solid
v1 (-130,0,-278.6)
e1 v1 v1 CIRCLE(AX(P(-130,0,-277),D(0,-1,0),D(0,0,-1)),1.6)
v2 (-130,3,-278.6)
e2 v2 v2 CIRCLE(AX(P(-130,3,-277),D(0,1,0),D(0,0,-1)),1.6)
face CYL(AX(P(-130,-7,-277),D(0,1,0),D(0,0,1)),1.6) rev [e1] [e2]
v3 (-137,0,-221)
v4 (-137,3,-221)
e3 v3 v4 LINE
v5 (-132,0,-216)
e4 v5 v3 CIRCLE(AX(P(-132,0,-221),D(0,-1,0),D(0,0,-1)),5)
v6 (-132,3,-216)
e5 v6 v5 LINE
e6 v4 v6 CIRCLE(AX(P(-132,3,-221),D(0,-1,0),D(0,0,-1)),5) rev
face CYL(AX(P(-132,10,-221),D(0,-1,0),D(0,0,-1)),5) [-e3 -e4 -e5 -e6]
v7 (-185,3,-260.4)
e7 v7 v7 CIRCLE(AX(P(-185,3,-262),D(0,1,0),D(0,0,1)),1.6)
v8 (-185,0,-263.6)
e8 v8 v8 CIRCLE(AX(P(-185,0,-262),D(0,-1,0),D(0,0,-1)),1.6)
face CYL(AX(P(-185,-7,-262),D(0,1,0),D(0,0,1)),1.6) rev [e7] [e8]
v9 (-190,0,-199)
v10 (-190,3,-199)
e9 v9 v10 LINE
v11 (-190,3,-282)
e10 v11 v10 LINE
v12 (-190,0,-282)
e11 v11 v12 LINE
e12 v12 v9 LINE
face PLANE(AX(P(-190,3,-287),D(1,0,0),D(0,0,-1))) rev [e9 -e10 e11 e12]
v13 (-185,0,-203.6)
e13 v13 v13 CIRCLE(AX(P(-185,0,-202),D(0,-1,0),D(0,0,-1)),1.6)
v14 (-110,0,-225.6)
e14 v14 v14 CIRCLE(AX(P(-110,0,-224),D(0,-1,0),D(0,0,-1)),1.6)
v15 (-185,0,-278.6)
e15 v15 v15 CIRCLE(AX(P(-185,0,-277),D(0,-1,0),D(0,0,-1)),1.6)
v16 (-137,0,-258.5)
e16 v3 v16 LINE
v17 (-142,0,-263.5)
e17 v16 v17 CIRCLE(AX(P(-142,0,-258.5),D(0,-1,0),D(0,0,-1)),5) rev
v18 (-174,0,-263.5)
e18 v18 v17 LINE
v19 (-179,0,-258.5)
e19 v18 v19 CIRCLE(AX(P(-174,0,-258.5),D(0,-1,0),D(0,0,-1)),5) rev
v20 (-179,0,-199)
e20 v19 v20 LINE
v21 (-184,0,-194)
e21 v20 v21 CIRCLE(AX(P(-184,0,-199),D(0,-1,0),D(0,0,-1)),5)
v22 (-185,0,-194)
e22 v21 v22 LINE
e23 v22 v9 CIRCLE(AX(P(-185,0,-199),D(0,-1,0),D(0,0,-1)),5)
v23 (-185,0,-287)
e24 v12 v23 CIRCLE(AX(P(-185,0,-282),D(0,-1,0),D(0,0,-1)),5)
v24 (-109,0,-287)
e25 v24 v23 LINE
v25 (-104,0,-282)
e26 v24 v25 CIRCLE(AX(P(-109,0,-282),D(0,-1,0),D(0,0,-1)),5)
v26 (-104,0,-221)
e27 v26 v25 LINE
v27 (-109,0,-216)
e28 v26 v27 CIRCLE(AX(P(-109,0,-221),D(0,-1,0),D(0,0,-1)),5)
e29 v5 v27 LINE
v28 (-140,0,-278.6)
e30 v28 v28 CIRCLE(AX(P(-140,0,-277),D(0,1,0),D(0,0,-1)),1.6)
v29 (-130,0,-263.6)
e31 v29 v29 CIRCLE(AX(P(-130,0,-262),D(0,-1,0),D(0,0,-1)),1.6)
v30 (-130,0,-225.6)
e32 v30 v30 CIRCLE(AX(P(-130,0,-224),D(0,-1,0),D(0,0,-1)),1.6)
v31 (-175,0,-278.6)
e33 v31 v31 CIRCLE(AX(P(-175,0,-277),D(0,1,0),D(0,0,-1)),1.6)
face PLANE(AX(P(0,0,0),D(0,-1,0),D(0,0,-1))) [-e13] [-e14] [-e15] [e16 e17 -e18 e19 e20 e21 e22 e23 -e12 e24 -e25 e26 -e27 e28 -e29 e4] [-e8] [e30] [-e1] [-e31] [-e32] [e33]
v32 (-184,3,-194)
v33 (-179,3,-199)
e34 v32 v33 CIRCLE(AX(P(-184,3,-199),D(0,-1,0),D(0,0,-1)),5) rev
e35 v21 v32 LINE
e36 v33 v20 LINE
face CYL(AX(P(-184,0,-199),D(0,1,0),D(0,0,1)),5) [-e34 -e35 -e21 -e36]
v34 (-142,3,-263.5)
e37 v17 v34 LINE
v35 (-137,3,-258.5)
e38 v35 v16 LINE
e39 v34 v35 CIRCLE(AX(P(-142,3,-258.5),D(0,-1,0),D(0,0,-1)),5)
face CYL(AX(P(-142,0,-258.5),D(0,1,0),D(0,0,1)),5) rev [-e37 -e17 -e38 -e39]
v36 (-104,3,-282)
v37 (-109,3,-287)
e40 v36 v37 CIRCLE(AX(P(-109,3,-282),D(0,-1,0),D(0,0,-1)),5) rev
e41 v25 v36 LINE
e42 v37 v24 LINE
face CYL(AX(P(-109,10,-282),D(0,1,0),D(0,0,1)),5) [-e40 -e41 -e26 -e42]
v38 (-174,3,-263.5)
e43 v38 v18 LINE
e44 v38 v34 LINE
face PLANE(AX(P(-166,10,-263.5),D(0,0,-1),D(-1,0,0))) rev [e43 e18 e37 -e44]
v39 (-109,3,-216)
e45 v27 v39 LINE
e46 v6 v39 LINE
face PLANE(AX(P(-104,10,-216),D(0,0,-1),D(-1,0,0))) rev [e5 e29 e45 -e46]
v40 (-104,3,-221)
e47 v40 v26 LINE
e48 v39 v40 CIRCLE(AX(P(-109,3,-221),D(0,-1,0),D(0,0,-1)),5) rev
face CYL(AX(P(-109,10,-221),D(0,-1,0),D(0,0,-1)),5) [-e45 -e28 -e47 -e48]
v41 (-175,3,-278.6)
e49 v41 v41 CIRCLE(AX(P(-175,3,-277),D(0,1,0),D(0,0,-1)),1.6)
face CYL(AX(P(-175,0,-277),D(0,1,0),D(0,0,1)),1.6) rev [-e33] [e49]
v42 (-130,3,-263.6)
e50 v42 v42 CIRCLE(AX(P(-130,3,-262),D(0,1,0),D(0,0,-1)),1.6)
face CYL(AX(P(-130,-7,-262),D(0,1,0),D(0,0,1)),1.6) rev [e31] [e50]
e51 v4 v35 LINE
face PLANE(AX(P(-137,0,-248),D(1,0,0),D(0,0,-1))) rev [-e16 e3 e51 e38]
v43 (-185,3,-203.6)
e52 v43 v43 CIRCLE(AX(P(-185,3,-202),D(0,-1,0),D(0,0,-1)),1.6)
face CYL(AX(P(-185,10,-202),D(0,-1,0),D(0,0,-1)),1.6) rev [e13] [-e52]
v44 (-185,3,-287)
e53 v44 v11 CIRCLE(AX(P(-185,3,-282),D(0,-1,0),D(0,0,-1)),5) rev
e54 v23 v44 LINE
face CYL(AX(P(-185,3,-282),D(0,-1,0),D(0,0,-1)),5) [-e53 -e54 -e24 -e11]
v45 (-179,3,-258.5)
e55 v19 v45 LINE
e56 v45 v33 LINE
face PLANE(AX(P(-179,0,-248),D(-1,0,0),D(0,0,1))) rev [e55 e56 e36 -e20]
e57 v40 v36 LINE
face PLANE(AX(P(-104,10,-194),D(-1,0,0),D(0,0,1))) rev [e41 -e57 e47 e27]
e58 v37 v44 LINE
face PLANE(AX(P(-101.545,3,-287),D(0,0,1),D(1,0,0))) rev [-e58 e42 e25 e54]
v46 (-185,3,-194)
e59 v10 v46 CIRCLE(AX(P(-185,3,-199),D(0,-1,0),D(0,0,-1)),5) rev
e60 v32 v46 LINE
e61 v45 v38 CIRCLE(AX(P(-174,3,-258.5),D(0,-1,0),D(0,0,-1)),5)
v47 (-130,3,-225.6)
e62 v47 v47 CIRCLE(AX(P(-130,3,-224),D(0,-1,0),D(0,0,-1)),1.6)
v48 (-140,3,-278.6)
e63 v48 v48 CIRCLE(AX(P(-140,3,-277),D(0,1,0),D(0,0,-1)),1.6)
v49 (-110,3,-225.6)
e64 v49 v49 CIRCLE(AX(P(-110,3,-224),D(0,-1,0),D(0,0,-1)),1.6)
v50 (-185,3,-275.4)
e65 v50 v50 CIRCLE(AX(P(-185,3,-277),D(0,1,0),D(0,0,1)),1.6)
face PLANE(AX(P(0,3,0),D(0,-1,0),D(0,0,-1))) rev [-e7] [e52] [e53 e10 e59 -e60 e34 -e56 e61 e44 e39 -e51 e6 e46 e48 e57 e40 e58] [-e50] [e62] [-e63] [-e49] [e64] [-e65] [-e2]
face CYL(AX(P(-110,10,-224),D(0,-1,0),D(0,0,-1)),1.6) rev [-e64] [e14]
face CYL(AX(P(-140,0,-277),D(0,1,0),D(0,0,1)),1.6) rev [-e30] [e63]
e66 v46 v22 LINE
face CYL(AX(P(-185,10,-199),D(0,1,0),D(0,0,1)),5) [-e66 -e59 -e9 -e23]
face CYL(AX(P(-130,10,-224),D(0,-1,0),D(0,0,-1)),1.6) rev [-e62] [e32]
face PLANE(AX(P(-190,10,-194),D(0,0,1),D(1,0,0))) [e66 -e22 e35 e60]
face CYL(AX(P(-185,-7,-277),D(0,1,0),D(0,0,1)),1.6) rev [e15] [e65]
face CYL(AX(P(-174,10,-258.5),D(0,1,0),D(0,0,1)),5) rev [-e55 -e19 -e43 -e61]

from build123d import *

# Parameters (mm, degrees)
EXTRUDE_1048_DEPTH      = 3
SKETCH_2_R              = 37.5
SKETCH_2_R_2            = 1.6
CUT_EXTRUDE_1713_DEPTH  = 3
SKETCH_8_W              = 65
SKETCH_8_H              = 25
CUT_EXTRUDE_2585_DEPTH  = 3
SKETCH_41_W             = 55
SKETCH_41_H             = 60
CUT_EXTRUDE_2_DEPTH     = 10
SKETCH_10_W             = 65
SKETCH_10_H             = 30
CUT_EXTRUDE_3791_DEPTH  = 3
SKETCH_11_R             = 1.6
SKETCH_11_W             = 42
SKETCH_11_H             = 28
CUT_EXTRUDE_4900_DEPTH  = 3
SKETCH_13_R             = 1.6
CUT_EXTRUDE_5556_DEPTH  = 3
SKETCH_14_R             = 2
CUT_EXTRUDE_5906_DEPTH  = 3
SKETCH_15_R             = 2
CUT_EXTRUDE_6166_DEPTH  = 3
SKETCH_16_R             = 1.6
CUT_EXTRUDE_6673_DEPTH  = 3
SKETCH_19_R             = 2
SKETCH_19_R_2           = 2.5
CUT_EXTRUDE_7839_DEPTH  = 3
SKETCH_21_R             = 1.6
CUT_EXTRUDE_7991_DEPTH  = 3
CUT_EXTRUDE_9_DEPTH     = 10
SKETCH_33_R             = 1.6
PC_DEPTH                = 10
SKETCH_36_R             = 1.6
CUT_EXTRUDE_9334_DEPTH  = 345.206333469
SKETCH_29_R             = 1.6
CUT_EXTRUDE_9716_DEPTH  = 10
SKETCH_39_R             = 1.6
CUT_EXTRUDE_10318_DEPTH = 10
SKETCH_42_W             = 40
SKETCH_42_H             = 40
CUT_EXTRUDE_11_DEPTH    = 10
SKETCH_34_R             = 1.6
UWB_DEPTH               = 10
SKETCH_47_R             = 1.6
CUT_EXTRUDE_13151_DEPTH = 345.206333469
SKETCH_48_R             = 1.6
CUT_EXTRUDE_14_DEPTH    = 345.206333469
CUT_EXTRUDE_6623_DEPTH  = 10
FILLET_13946_R          = 5
FILLET_14545_R          = 2
SKETCH_53_R             = 1.6
RFID_DEPTH              = 10
SKETCH_54_R             = 1.6
CUT_EXTRUDE_19166_DEPTH = 10
SKETCH_55_OUTSIDE_W     = 518.68
SKETCH_55_OUTSIDE_H     = 706.68
CUT_EXTRUDE_17_DEPTH    = 10
FILLET_1_R              = 5
SKETCH_56_R             = 1.6
CUT_EXTRUDE_18_DEPTH    = 10
SKETCH_57_W             = 16
SKETCH_57_H             = 59
CUT_EXTRUDE_19_DEPTH    = 10
SKETCH_58_R             = 1.55
CUT_EXTRUDE_20_DEPTH    = 10
FILLET_2_R              = 2
SKETCH_59_W             = 42
SKETCH_59_H             = 69.5
CUT_EXTRUDE_21_DEPTH    = 10
SKETCH_61_W             = 31.526817686
SKETCH_61_H             = 93
CUT_EXTRUDE_23_DEPTH    = 10
SKETCH_62_W             = 33
SKETCH_62_H             = 22
CUT_EXTRUDE_24_DEPTH    = 10
FILLET_3_R              = 5
SKETCH_63_R             = 1.6
CUT_EXTRUDE_25_DEPTH    = 10


with BuildPart() as part:
    # 草图1 → Extrude 1048 (new body)
    with BuildSketch(Plane(origin=(0, 0, 0), x_dir=(1, 0, 0), z_dir=(0, 1, 0))):
        Polygon((190, 287), (101.545, 287), (79.605689771, 249), (-79.605689771, 249), (-101.545, 287), (-190, 287), (-190, 0), (-190, -281), (-144.091695942, -281), (-98.660254038, -281), (-74.411542732, -239), (74.411542732, -239), (98.660254038, -281), (144.091695942, -281), (190, -281), (190, 0), align=None)
    extrude(amount=EXTRUDE_1048_DEPTH)

    # 草图2 → Cut-Extrude 1713 (cut)
    with BuildSketch(Plane(origin=(0, 3, 0), x_dir=(1, 0, 0), z_dir=(0, 1, 0))):
        Circle(SKETCH_2_R)
        with Locations((38.97114317, 22.5)):
            Circle(SKETCH_2_R_2)
        with Locations((0, -45)):
            Circle(SKETCH_2_R_2)
        with Locations((-38.97114317, 22.5)):
            Circle(SKETCH_2_R_2)
    extrude(amount=-CUT_EXTRUDE_1713_DEPTH, mode=Mode.SUBTRACT)

    # 草图8 → Cut-Extrude 2585 (cut)
    with BuildSketch(Plane(origin=(0, 3, 0), x_dir=(1, 0, 0), z_dir=(0, 1, 0))):
        with Locations((115, -161.5)):
            Rectangle(SKETCH_8_W, SKETCH_8_H)
        with Locations((-115, -161.5)):
            Rectangle(SKETCH_8_W, SKETCH_8_H)
    extrude(amount=-CUT_EXTRUDE_2585_DEPTH, mode=Mode.SUBTRACT)

    # 草图41 → 减重过线孔2 (cut)
    with BuildSketch(Plane(origin=(0, 3, 0), x_dir=(1, 0, 0), z_dir=(0, 1, 0))):
        with Locations((-102.5, 70)):
            Rectangle(SKETCH_41_W, SKETCH_41_H)
        with Locations((102.5, 70)):
            Rectangle(SKETCH_41_W, SKETCH_41_H)
        with Locations((102.5, -70)):
            Rectangle(SKETCH_41_W, SKETCH_41_H)
        with Locations((-102.5, -70)):
            Rectangle(SKETCH_41_W, SKETCH_41_H)
    extrude(amount=-CUT_EXTRUDE_2_DEPTH, mode=Mode.SUBTRACT)

    # 草图10 → Cut-Extrude 3791 (cut)
    with BuildSketch(Plane(origin=(0, 3, 0), x_dir=(1, 0, 0), z_dir=(0, 1, 0))):
        with Locations((-130, 167)):
            Rectangle(SKETCH_10_W, SKETCH_10_H)
        with Locations((130, 167)):
            Rectangle(SKETCH_10_W, SKETCH_10_H)
    extrude(amount=-CUT_EXTRUDE_3791_DEPTH, mode=Mode.SUBTRACT)

    # 草图11 → Cut-Extrude 4900 (cut)
    with BuildSketch(Plane(origin=(0, 3, 0), x_dir=(1, 0, 0), z_dir=(0, 1, 0))):
        with Locations((-153.5, 259)):
            Circle(SKETCH_11_R)
        with Locations((-162.5, 259)):
            Circle(SKETCH_11_R)
        with Locations((-153.5, 209)):
            Circle(SKETCH_11_R)
        with Locations((-162.5, 209)):
            Circle(SKETCH_11_R)
        with Locations((153.5, 259)):
            Circle(SKETCH_11_R)
        with Locations((162.5, 259)):
            Circle(SKETCH_11_R)
        with Locations((153.5, 209)):
            Circle(SKETCH_11_R)
        with Locations((162.5, 209)):
            Circle(SKETCH_11_R)
        with Locations((162.5, -209)):
            Circle(SKETCH_11_R)
        with Locations((153.5, -209)):
            Circle(SKETCH_11_R)
        with Locations((162.5, -259)):
            Circle(SKETCH_11_R)
        with Locations((153.5, -259)):
            Circle(SKETCH_11_R)
        with Locations((-162.5, -209)):
            Circle(SKETCH_11_R)
        with Locations((-153.5, -209)):
            Circle(SKETCH_11_R)
        with Locations((-153.5, -259)):
            Circle(SKETCH_11_R)
        with Locations((-162.5, -259)):
            Circle(SKETCH_11_R)
        with Locations((-158, 234)):
            Rectangle(SKETCH_11_W, SKETCH_11_H)
        with Locations((158, 234)):
            Rectangle(SKETCH_11_W, SKETCH_11_H)
        with Locations((158, -234)):
            Rectangle(SKETCH_11_W, SKETCH_11_H)
        with Locations((-158, -234)):
            Rectangle(SKETCH_11_W, SKETCH_11_H)
    extrude(amount=-CUT_EXTRUDE_4900_DEPTH, mode=Mode.SUBTRACT)

    # 草图13 → Cut-Extrude 5556 (cut)
    with BuildSketch(Plane(origin=(0, 3, 0), x_dir=(1, 0, 0), z_dir=(0, 1, 0))):
        with Locations((25, 176)):
            Circle(SKETCH_13_R)
        with Locations((25, 226)):
            Circle(SKETCH_13_R)
        with Locations((-25, 226)):
            Circle(SKETCH_13_R)
        with Locations((-25, 176)):
            Circle(SKETCH_13_R)
    extrude(amount=-CUT_EXTRUDE_5556_DEPTH, mode=Mode.SUBTRACT)

    # 草图14 → Cut-Extrude 5906 (cut)
    with BuildSketch(Plane(origin=(0, 3, 0), x_dir=(1, 0, 0), z_dir=(0, 1, 0))):
        with Locations((-47.5, 239)):
            Circle(SKETCH_14_R)
        with Locations((-47.5, 214)):
            Circle(SKETCH_14_R)
        with Locations((47.5, 214)):
            Circle(SKETCH_14_R)
        with Locations((47.5, 239)):
            Circle(SKETCH_14_R)
        with Locations((-47.5, -207)):
            Circle(SKETCH_14_R)
        with Locations((-47.5, -232)):
            Circle(SKETCH_14_R)
        with Locations((47.5, -232)):
            Circle(SKETCH_14_R)
        with Locations((47.5, -207)):
            Circle(SKETCH_14_R)
    extrude(amount=-CUT_EXTRUDE_5906_DEPTH, mode=Mode.SUBTRACT)

    # 草图15 → Cut-Extrude 6166 (cut)
    with BuildSketch(Plane(origin=(0, 3, 0), x_dir=(1, 0, 0), z_dir=(0, 1, 0))):
        with Locations((155, 47.5)):
            Circle(SKETCH_15_R)
        with Locations((180, 47.5)):
            Circle(SKETCH_15_R)
        with Locations((180, -47.5)):
            Circle(SKETCH_15_R)
        with Locations((155, -47.5)):
            Circle(SKETCH_15_R)
        with Locations((-155, -47.5)):
            Circle(SKETCH_15_R)
        with Locations((-180, -47.5)):
            Circle(SKETCH_15_R)
        with Locations((-180, 47.5)):
            Circle(SKETCH_15_R)
        with Locations((-155, 47.5)):
            Circle(SKETCH_15_R)
    extrude(amount=-CUT_EXTRUDE_6166_DEPTH, mode=Mode.SUBTRACT)

    # 草图16 → Cut-Extrude 6673 (cut)
    with BuildSketch(Plane(origin=(0, 3, 0), x_dir=(1, 0, 0), z_dir=(0, 1, 0))):
        with Locations((-64, 229)):
            Circle(SKETCH_16_R)
        with Locations((-64, 117)):
            Circle(SKETCH_16_R)
        with Locations((-64, 5)):
            Circle(SKETCH_16_R)
        with Locations((-64, -107)):
            Circle(SKETCH_16_R)
        with Locations((-64, -219)):
            Circle(SKETCH_16_R)
        with Locations((64, 229)):
            Circle(SKETCH_16_R)
        with Locations((64, -107)):
            Circle(SKETCH_16_R)
        with Locations((64, 5)):
            Circle(SKETCH_16_R)
        with Locations((64, 117)):
            Circle(SKETCH_16_R)
        with Locations((64, -219)):
            Circle(SKETCH_16_R)
    extrude(amount=-CUT_EXTRUDE_6673_DEPTH, mode=Mode.SUBTRACT)

    # 草图19 → Cut-Extrude 7839 (cut)
    with BuildSketch(Plane(origin=(0, 3, 0), x_dir=(1, 0, 0), z_dir=(0, 1, 0))):
        with Locations((-177.5, -78)):
            Circle(SKETCH_19_R)
        with Locations((-177.5, -94)):
            Circle(SKETCH_19_R_2)
        with Locations((-177.5, 94)):
            Circle(SKETCH_19_R_2)
        with Locations((-177.5, 78)):
            Circle(SKETCH_19_R)
        with Locations((177.5, -94)):
            Circle(SKETCH_19_R_2)
        with Locations((177.5, -78)):
            Circle(SKETCH_19_R)
        with Locations((177.5, 78)):
            Circle(SKETCH_19_R)
        with Locations((177.5, 94)):
            Circle(SKETCH_19_R_2)
    extrude(amount=-CUT_EXTRUDE_7839_DEPTH, mode=Mode.SUBTRACT)

    # 草图21 → Cut-Extrude 7991 (cut)
    with BuildSketch(Plane(origin=(0, 3, 0), x_dir=(1, 0, 0), z_dir=(0, 1, 0))):
        with Locations((0, -93)):
            Circle(SKETCH_21_R)
    extrude(amount=-CUT_EXTRUDE_7991_DEPTH, mode=Mode.SUBTRACT)

    # 草图32 → 切除-拉伸9 (cut)
    with BuildSketch(Plane(origin=(0, 3, 0), x_dir=(1, 0, 0), z_dir=(0, 1, 0))):
        with BuildLine():
            Line((-34.5, -190), (34.5, -190))
            ThreePointArc((34.5, -190), (36.621320344, -189.121320344), (37.5, -187))
            Line((37.5, -187), (37.5, -133))
            ThreePointArc((37.5, -133), (36.621320344, -130.878679656), (34.5, -130))
            Line((34.5, -130), (-34.5, -130))
            ThreePointArc((-34.5, -130), (-36.621320344, -130.878679656), (-37.5, -133))
            Line((-37.5, -133), (-37.5, -187))
            ThreePointArc((-37.5, -187), (-36.621320344, -189.121320344), (-34.5, -190))
        make_face()
    extrude(amount=-CUT_EXTRUDE_9_DEPTH, mode=Mode.SUBTRACT)

    # 草图33 → PC座固定孔 (cut)
    with BuildSketch(Plane(origin=(0, 3, 0), x_dir=(1, 0, 0), z_dir=(0, 1, 0))):
        with Locations((-42.5, -120.5)):
            Circle(SKETCH_33_R)
        with Locations((42.5, -120.5)):
            Circle(SKETCH_33_R)
    extrude(amount=-PC_DEPTH, mode=Mode.SUBTRACT)

    # 草图36 → Cut-Extrude 9334 (cut, through all)
    with BuildSketch(Plane(origin=(0, 3, 0), x_dir=(1, 0, 0), z_dir=(0, 1, 0))):
        with Locations((-80, -231)):
            Circle(SKETCH_36_R)
        with Locations((-80, -219)):
            Circle(SKETCH_36_R)
        with Locations((80, -219)):
            Circle(SKETCH_36_R)
        with Locations((80, -231)):
            Circle(SKETCH_36_R)
        with Locations((-80, 241)):
            Circle(SKETCH_36_R)
        with Locations((-80, 229)):
            Circle(SKETCH_36_R)
        with Locations((80, 229)):
            Circle(SKETCH_36_R)
        with Locations((80, 241)):
            Circle(SKETCH_36_R)
    extrude(amount=-CUT_EXTRUDE_9334_DEPTH, mode=Mode.SUBTRACT)

    # 草图29 → Cut-Extrude 9716 (cut)
    with BuildSketch(Plane(origin=(0, 3, 0), x_dir=(1, 0, 0), z_dir=(0, 1, 0))):
        with Locations((48, 120)):
            Circle(SKETCH_29_R)
        with Locations((0, 86)):
            Circle(SKETCH_29_R)
        with Locations((0, 154)):
            Circle(SKETCH_29_R)
        with Locations((-48, 120)):
            Circle(SKETCH_29_R)
        with BuildLine():
            Line((40, 98), (40, 142))
            ThreePointArc((40, 142), (39.121320344, 144.121320344), (37, 145))
            Line((37, 145), (-37, 145))
            ThreePointArc((-37, 145), (-39.121320344, 144.121320344), (-40, 142))
            Line((-40, 142), (-40, 98))
            ThreePointArc((-40, 98), (-39.121320344, 95.878679656), (-37, 95))
            Line((-37, 95), (37, 95))
            ThreePointArc((37, 95), (39.121320344, 95.878679656), (40, 98))
        make_face()
    extrude(amount=-CUT_EXTRUDE_9716_DEPTH, mode=Mode.SUBTRACT)

    # 草图39 → Cut-Extrude 10318 (cut)
    with BuildSketch(Plane(origin=(0, 3, 0), x_dir=(1, 0, 0), z_dir=(0, 1, 0))):
        with Locations((185, -271)):
            Circle(SKETCH_39_R)
        with Locations((185, -256)):
            Circle(SKETCH_39_R)
        with Locations((130, -256)):
            Circle(SKETCH_39_R)
        with Locations((130, -271)):
            Circle(SKETCH_39_R)
        with Locations((-130, -271)):
            Circle(SKETCH_39_R)
        with Locations((-130, -256)):
            Circle(SKETCH_39_R)
        with Locations((-185, -256)):
            Circle(SKETCH_39_R)
        with Locations((-185, -271)):
            Circle(SKETCH_39_R)
        with Locations((-130, 262)):
            Circle(SKETCH_39_R)
        with Locations((-130, 277)):
            Circle(SKETCH_39_R)
        with Locations((185, 262)):
            Circle(SKETCH_39_R)
        with Locations((185, 277)):
            Circle(SKETCH_39_R)
        with Locations((-185, 277)):
            Circle(SKETCH_39_R)
        with Locations((-185, 262)):
            Circle(SKETCH_39_R)
        with Locations((130, 277)):
            Circle(SKETCH_39_R)
        with Locations((130, 262)):
            Circle(SKETCH_39_R)
    extrude(amount=-CUT_EXTRUDE_10318_DEPTH, mode=Mode.SUBTRACT)

    # 草图42 → 切除-拉伸11 (cut)
    with BuildSketch(Plane(origin=(0, 3, 0), x_dir=(1, 0, 0), z_dir=(0, 1, 0))):
        with Locations((0, 201)):
            Rectangle(SKETCH_42_W, SKETCH_42_H)
    extrude(amount=-CUT_EXTRUDE_11_DEPTH, mode=Mode.SUBTRACT)

    # 草图34 → UWB固定孔 (cut)
    with BuildSketch(Plane(origin=(0, 3, 0), x_dir=(1, 0, 0), z_dir=(0, 1, 0))):
        with Locations((90, 168)):
            Circle(SKETCH_34_R)
        with Locations((71, 187)):
            Circle(SKETCH_34_R)
        with Locations((90, 206)):
            Circle(SKETCH_34_R)
        with Locations((109, 187)):
            Circle(SKETCH_34_R)
    extrude(amount=-UWB_DEPTH, mode=Mode.SUBTRACT)

    # 草图47 → Cut-Extrude 13151 (cut, through all)
    with BuildSketch(Plane(origin=(0, 3, 0), x_dir=(1, 0, 0), z_dir=(0, 1, 0))):
        with Locations((140, 277)):
            Circle(SKETCH_47_R)
        with Locations((185, -271)):
            Circle(SKETCH_47_R)
        with Locations((95, -231)):
            Circle(SKETCH_47_R)
        with Locations((175, -271)):
            Circle(SKETCH_47_R)
        with Locations((140, 213)):
            Circle(SKETCH_47_R)
        with Locations((175, -207)):
            Circle(SKETCH_47_R)
        with Locations((-140, -271)):
            Circle(SKETCH_47_R)
        with Locations((-140, -207)):
            Circle(SKETCH_47_R)
        with Locations((-175, 213)):
            Circle(SKETCH_47_R)
        with Locations((-95, 237)):
            Circle(SKETCH_47_R)
        with Locations((185, 277)):
            Circle(SKETCH_47_R)
        with Locations((175, 277)):
            Circle(SKETCH_47_R)
        with Locations((95, 237)):
            Circle(SKETCH_47_R)
        with Locations((175, 213)):
            Circle(SKETCH_47_R)
        with Locations((-175, 277)):
            Circle(SKETCH_47_R)
        with Locations((-185, 277)):
            Circle(SKETCH_47_R)
        with Locations((140, -207)):
            Circle(SKETCH_47_R)
        with Locations((140, -271)):
            Circle(SKETCH_47_R)
        with Locations((-175, -207)):
            Circle(SKETCH_47_R)
        with Locations((-140, 213)):
            Circle(SKETCH_47_R)
        with Locations((-175, -271)):
            Circle(SKETCH_47_R)
        with Locations((-95, -231)):
            Circle(SKETCH_47_R)
        with Locations((-185, -271)):
            Circle(SKETCH_47_R)
        with Locations((-140, 277)):
            Circle(SKETCH_47_R)
    extrude(amount=-CUT_EXTRUDE_13151_DEPTH, mode=Mode.SUBTRACT)

    # 草图48 → 切除-拉伸14 (cut, through all)
    with BuildSketch(Plane(origin=(0, 3, 0), x_dir=(1, 0, 0), z_dir=(0, 1, 0))):
        with Locations((-44.5, -46)):
            Circle(SKETCH_48_R)
        with Locations((44.5, -46)):
            Circle(SKETCH_48_R)
        with Locations((-9, -196)):
            Circle(SKETCH_48_R)
        with Locations((9, -196)):
            Circle(SKETCH_48_R)
    extrude(amount=-CUT_EXTRUDE_14_DEPTH, mode=Mode.SUBTRACT)

    # 草图51 → 6623电机过线孔 (cut)
    with BuildSketch(Plane(origin=(0, 3, 0), x_dir=(1, 0, 0), z_dir=(0, 1, 0))):
        with BuildLine():
            Line((-20.5, 67.5), (20.5, 67.5))
            ThreePointArc((20.5, 67.5), (21.914213562, 66.914213562), (22.5, 65.5))
            Line((22.5, 65.5), (22.5, 54.5))
            ThreePointArc((22.5, 54.5), (21.914213562, 53.085786438), (20.5, 52.5))
            Line((20.5, 52.5), (-20.5, 52.5))
            ThreePointArc((-20.5, 52.5), (-21.914213562, 53.085786438), (-22.5, 54.5))
            Line((-22.5, 54.5), (-22.5, 65.5))
            ThreePointArc((-22.5, 65.5), (-21.914213562, 66.914213562), (-20.5, 67.5))
        make_face()
    extrude(amount=-CUT_EXTRUDE_6623_DEPTH, mode=Mode.SUBTRACT)

    # Fillet 13946
    fillet_13946_edges = [part.edges().sort_by_distance(p)[0] for p in [
        (-190, 1.5, -287),
        (-101.545, 1.5, -287),
        (-79.605689771, 1.5, -249),
        (79.605689771, 1.5, -249),
        (101.545, 1.5, -287),
        (190, 1.5, -287),
        (190, 1.5, 281),
        (98.660254038, 1.5, 281),
        (74.411542732, 1.5, 239),
        (-74.411542732, 1.5, 239),
        (-98.660254038, 1.5, 281),
        (-190, 1.5, 281),
    ]]
    fillet(fillet_13946_edges, radius=FILLET_13946_R)

    # Fillet 14545
    fillet_14545_edges = [part.edges().sort_by_distance(p)[0] for p in [
        (-147.5, 1.5, 149),
        (-82.5, 1.5, 149),
        (-82.5, 1.5, 174),
        (-147.5, 1.5, 174),
        (82.5, 1.5, 149),
        (147.5, 1.5, 149),
        (147.5, 1.5, 174),
        (82.5, 1.5, 174),
        (-130, 1.5, -100),
        (-75, 1.5, -100),
        (-75, 1.5, -40),
        (-130, 1.5, -40),
        (-130, 1.5, 100),
        (-130, 1.5, 40),
        (-75, 1.5, 40),
        (-75, 1.5, 100),
        (130, 1.5, 100),
        (75, 1.5, 100),
        (75, 1.5, 40),
        (130, 1.5, 40),
        (130, 1.5, -100),
        (130, 1.5, -40),
        (75, 1.5, -40),
        (75, 1.5, -100),
        (-97.5, 1.5, -152),
        (-162.5, 1.5, -152),
        (-162.5, 1.5, -182),
        (-97.5, 1.5, -182),
        (162.5, 1.5, -182),
        (-137, 1.5, -220),
        (-179, 1.5, -220),
        (-179, 1.5, -248),
        (-137, 1.5, -248),
        (-179, 1.5, 220),
        (-137, 1.5, 220),
        (-137, 1.5, 248),
        (179, 1.5, 248),
        (137, 1.5, 248),
        (137, 1.5, 220),
        (179, 1.5, 220),
        (179, 1.5, -248),
        (179, 1.5, -220),
        (137, 1.5, -220),
        (137, 1.5, -248),
        (20, 1.5, -181),
        (-20, 1.5, -181),
        (-20, 1.5, -221),
        (20, 1.5, -221),
        (-179, 1.5, 248),
        (162.5, 1.5, -152),
        (97.5, 1.5, -152),
        (97.5, 1.5, -182),
    ]]
    fillet(fillet_14545_edges, radius=FILLET_14545_R)

    # 草图53 → RFID固定孔 (cut)
    with BuildSketch(Plane(origin=(0, 3, 0), x_dir=(1, 0, 0), z_dir=(0, 1, 0))):
        with Locations((-135, -31)):
            Circle(SKETCH_53_R)
        with Locations((-85, -31)):
            Circle(SKETCH_53_R)
        with Locations((-85, 31)):
            Circle(SKETCH_53_R)
        with Locations((-135, 31)):
            Circle(SKETCH_53_R)
        with Locations((135, 31)):
            Circle(SKETCH_53_R)
        with Locations((85, 31)):
            Circle(SKETCH_53_R)
        with Locations((85, -31)):
            Circle(SKETCH_53_R)
        with Locations((135, -31)):
            Circle(SKETCH_53_R)
    extrude(amount=-RFID_DEPTH, mode=Mode.SUBTRACT)

    # 草图54 → Cut-Extrude 19166 (cut)
    with BuildSketch(Plane.XZ):
        with Locations((-102.122350269, -278)):
            Circle(SKETCH_54_R)
        with Locations((-92.122350269, -260.679491924)):
            Circle(SKETCH_54_R)
        with Locations((92.122350269, -260.679491924)):
            Circle(SKETCH_54_R)
        with Locations((102.122350269, -278)):
            Circle(SKETCH_54_R)
        with Locations((102.122350269, 272)):
            Circle(SKETCH_54_R)
        with Locations((92.122350269, 254.679491924)):
            Circle(SKETCH_54_R)
        with Locations((-92.122350269, 254.679491924)):
            Circle(SKETCH_54_R)
        with Locations((-102.122350269, 272)):
            Circle(SKETCH_54_R)
    extrude(amount=-CUT_EXTRUDE_19166_DEPTH, mode=Mode.SUBTRACT)

    # 草图55 outside → 切除-拉伸17 (cut)
    with BuildSketch(Plane.XZ):
        with Locations((0, -3)):
            Rectangle(SKETCH_55_OUTSIDE_W, SKETCH_55_OUTSIDE_H)
        with BuildLine():
            Line((-190, -194), (-125, -194))
            Line((-125, -194), (-87, -230))
            Line((-87, -230), (-87, -261.807321004))
            Line((-87, -261.807321004), (-100.101624327, -284.5))
            ThreePointArc((-100.101624327, -284.5), (-101.931751346, -286.330127019), (-104.431751346, -287))
            Line((-104.431751346, -287), (-185, -287))
            ThreePointArc((-185, -287), (-188.535533906, -285.535533906), (-190, -282))
            Line((-190, -282), (-190, -194))
        make_face(mode=Mode.SUBTRACT)
    extrude(amount=-CUT_EXTRUDE_17_DEPTH, mode=Mode.SUBTRACT)

    # 圆角1
    fillet_1_edges = [part.edges().sort_by_distance(p)[0] for p in [
        (-190, 1.5, -194),
        (-87, 1.5, -261.807321004),
        (-87, 1.5, -230),
        (-125, 1.5, -194),
    ]]
    fillet(fillet_1_edges, radius=FILLET_1_R)

    # 草图56 → 切除-拉伸18 (cut)
    with BuildSketch(Plane.XZ):
        with Locations((-185, -202)):
            Circle(SKETCH_56_R)
        with Locations((-131, -202)):
            Circle(SKETCH_56_R)
    extrude(amount=-CUT_EXTRUDE_18_DEPTH, mode=Mode.SUBTRACT)

    # 草图57 → 切除-拉伸19 (cut)
    with BuildSketch(Plane.XZ):
        with Locations((-158, -234)):
            Rectangle(SKETCH_57_W, SKETCH_57_H)
    extrude(amount=-CUT_EXTRUDE_19_DEPTH, mode=Mode.SUBTRACT)

    # 草图58 → 切除-拉伸20 (cut)
    with BuildSketch(Plane.XZ):
        with Locations((-150, -261.95)):
            Circle(SKETCH_58_R)
        with Locations((-166, -261.95)):
            Circle(SKETCH_58_R)
        with Locations((-166, -206.05)):
            Circle(SKETCH_58_R)
        with Locations((-150, -206.05)):
            Circle(SKETCH_58_R)
    extrude(amount=-CUT_EXTRUDE_20_DEPTH, mode=Mode.SUBTRACT)

    # 圆角2
    fillet_2_edges = [part.edges().sort_by_distance(p)[0] for p in [
        (-150, 1.5, -248),
        (-166, 1.5, -248),
        (-150, 1.5, -220),
        (-166, 1.5, -220),
    ]]
    fillet(fillet_2_edges, radius=FILLET_2_R)

    # 草图59 → 切除-拉伸21 (cut)
    with BuildSketch(Plane.XZ):
        with Locations((-158, -228.75)):
            Rectangle(SKETCH_59_W, SKETCH_59_H)
    extrude(amount=-CUT_EXTRUDE_21_DEPTH, mode=Mode.SUBTRACT)

    # 草图61 → 切除-拉伸23 (cut)
    with BuildSketch(Plane.XZ):
        with Locations((-88.236591157, -240.5)):
            Rectangle(SKETCH_61_W, SKETCH_61_H)
    extrude(amount=-CUT_EXTRUDE_23_DEPTH, mode=Mode.SUBTRACT)

    # 草图62 → 切除-拉伸24 (cut)
    with BuildSketch(Plane.XZ):
        with Locations((-120.5, -205)):
            Rectangle(SKETCH_62_W, SKETCH_62_H)
    extrude(amount=-CUT_EXTRUDE_24_DEPTH, mode=Mode.SUBTRACT)

    # 圆角3
    fillet_3_edges = [part.edges().sort_by_distance(p)[0] for p in [
        (-137, 1.5, -263.5),
        (-179, 1.5, -263.5),
    ]]
    fillet(fillet_3_edges, radius=FILLET_3_R)
    fillet_3_2_edges = [part.edges().sort_by_distance(p)[0] for p in [
        (-104, 1.5, -286.981324199),
        (-104, 1.5, -216),
        (-137, 1.5, -216),
        (-179, 1.5, -194),
    ]]
    fillet(fillet_3_2_edges, radius=FILLET_3_R)

    # 草图63 → 切除-拉伸25 (cut)
    with BuildSketch(Plane.XZ):
        with Locations((-130, -224)):
            Circle(SKETCH_63_R)
        with Locations((-110, -224)):
            Circle(SKETCH_63_R)
    extrude(amount=-CUT_EXTRUDE_25_DEPTH, mode=Mode.SUBTRACT)


solid = part.part
